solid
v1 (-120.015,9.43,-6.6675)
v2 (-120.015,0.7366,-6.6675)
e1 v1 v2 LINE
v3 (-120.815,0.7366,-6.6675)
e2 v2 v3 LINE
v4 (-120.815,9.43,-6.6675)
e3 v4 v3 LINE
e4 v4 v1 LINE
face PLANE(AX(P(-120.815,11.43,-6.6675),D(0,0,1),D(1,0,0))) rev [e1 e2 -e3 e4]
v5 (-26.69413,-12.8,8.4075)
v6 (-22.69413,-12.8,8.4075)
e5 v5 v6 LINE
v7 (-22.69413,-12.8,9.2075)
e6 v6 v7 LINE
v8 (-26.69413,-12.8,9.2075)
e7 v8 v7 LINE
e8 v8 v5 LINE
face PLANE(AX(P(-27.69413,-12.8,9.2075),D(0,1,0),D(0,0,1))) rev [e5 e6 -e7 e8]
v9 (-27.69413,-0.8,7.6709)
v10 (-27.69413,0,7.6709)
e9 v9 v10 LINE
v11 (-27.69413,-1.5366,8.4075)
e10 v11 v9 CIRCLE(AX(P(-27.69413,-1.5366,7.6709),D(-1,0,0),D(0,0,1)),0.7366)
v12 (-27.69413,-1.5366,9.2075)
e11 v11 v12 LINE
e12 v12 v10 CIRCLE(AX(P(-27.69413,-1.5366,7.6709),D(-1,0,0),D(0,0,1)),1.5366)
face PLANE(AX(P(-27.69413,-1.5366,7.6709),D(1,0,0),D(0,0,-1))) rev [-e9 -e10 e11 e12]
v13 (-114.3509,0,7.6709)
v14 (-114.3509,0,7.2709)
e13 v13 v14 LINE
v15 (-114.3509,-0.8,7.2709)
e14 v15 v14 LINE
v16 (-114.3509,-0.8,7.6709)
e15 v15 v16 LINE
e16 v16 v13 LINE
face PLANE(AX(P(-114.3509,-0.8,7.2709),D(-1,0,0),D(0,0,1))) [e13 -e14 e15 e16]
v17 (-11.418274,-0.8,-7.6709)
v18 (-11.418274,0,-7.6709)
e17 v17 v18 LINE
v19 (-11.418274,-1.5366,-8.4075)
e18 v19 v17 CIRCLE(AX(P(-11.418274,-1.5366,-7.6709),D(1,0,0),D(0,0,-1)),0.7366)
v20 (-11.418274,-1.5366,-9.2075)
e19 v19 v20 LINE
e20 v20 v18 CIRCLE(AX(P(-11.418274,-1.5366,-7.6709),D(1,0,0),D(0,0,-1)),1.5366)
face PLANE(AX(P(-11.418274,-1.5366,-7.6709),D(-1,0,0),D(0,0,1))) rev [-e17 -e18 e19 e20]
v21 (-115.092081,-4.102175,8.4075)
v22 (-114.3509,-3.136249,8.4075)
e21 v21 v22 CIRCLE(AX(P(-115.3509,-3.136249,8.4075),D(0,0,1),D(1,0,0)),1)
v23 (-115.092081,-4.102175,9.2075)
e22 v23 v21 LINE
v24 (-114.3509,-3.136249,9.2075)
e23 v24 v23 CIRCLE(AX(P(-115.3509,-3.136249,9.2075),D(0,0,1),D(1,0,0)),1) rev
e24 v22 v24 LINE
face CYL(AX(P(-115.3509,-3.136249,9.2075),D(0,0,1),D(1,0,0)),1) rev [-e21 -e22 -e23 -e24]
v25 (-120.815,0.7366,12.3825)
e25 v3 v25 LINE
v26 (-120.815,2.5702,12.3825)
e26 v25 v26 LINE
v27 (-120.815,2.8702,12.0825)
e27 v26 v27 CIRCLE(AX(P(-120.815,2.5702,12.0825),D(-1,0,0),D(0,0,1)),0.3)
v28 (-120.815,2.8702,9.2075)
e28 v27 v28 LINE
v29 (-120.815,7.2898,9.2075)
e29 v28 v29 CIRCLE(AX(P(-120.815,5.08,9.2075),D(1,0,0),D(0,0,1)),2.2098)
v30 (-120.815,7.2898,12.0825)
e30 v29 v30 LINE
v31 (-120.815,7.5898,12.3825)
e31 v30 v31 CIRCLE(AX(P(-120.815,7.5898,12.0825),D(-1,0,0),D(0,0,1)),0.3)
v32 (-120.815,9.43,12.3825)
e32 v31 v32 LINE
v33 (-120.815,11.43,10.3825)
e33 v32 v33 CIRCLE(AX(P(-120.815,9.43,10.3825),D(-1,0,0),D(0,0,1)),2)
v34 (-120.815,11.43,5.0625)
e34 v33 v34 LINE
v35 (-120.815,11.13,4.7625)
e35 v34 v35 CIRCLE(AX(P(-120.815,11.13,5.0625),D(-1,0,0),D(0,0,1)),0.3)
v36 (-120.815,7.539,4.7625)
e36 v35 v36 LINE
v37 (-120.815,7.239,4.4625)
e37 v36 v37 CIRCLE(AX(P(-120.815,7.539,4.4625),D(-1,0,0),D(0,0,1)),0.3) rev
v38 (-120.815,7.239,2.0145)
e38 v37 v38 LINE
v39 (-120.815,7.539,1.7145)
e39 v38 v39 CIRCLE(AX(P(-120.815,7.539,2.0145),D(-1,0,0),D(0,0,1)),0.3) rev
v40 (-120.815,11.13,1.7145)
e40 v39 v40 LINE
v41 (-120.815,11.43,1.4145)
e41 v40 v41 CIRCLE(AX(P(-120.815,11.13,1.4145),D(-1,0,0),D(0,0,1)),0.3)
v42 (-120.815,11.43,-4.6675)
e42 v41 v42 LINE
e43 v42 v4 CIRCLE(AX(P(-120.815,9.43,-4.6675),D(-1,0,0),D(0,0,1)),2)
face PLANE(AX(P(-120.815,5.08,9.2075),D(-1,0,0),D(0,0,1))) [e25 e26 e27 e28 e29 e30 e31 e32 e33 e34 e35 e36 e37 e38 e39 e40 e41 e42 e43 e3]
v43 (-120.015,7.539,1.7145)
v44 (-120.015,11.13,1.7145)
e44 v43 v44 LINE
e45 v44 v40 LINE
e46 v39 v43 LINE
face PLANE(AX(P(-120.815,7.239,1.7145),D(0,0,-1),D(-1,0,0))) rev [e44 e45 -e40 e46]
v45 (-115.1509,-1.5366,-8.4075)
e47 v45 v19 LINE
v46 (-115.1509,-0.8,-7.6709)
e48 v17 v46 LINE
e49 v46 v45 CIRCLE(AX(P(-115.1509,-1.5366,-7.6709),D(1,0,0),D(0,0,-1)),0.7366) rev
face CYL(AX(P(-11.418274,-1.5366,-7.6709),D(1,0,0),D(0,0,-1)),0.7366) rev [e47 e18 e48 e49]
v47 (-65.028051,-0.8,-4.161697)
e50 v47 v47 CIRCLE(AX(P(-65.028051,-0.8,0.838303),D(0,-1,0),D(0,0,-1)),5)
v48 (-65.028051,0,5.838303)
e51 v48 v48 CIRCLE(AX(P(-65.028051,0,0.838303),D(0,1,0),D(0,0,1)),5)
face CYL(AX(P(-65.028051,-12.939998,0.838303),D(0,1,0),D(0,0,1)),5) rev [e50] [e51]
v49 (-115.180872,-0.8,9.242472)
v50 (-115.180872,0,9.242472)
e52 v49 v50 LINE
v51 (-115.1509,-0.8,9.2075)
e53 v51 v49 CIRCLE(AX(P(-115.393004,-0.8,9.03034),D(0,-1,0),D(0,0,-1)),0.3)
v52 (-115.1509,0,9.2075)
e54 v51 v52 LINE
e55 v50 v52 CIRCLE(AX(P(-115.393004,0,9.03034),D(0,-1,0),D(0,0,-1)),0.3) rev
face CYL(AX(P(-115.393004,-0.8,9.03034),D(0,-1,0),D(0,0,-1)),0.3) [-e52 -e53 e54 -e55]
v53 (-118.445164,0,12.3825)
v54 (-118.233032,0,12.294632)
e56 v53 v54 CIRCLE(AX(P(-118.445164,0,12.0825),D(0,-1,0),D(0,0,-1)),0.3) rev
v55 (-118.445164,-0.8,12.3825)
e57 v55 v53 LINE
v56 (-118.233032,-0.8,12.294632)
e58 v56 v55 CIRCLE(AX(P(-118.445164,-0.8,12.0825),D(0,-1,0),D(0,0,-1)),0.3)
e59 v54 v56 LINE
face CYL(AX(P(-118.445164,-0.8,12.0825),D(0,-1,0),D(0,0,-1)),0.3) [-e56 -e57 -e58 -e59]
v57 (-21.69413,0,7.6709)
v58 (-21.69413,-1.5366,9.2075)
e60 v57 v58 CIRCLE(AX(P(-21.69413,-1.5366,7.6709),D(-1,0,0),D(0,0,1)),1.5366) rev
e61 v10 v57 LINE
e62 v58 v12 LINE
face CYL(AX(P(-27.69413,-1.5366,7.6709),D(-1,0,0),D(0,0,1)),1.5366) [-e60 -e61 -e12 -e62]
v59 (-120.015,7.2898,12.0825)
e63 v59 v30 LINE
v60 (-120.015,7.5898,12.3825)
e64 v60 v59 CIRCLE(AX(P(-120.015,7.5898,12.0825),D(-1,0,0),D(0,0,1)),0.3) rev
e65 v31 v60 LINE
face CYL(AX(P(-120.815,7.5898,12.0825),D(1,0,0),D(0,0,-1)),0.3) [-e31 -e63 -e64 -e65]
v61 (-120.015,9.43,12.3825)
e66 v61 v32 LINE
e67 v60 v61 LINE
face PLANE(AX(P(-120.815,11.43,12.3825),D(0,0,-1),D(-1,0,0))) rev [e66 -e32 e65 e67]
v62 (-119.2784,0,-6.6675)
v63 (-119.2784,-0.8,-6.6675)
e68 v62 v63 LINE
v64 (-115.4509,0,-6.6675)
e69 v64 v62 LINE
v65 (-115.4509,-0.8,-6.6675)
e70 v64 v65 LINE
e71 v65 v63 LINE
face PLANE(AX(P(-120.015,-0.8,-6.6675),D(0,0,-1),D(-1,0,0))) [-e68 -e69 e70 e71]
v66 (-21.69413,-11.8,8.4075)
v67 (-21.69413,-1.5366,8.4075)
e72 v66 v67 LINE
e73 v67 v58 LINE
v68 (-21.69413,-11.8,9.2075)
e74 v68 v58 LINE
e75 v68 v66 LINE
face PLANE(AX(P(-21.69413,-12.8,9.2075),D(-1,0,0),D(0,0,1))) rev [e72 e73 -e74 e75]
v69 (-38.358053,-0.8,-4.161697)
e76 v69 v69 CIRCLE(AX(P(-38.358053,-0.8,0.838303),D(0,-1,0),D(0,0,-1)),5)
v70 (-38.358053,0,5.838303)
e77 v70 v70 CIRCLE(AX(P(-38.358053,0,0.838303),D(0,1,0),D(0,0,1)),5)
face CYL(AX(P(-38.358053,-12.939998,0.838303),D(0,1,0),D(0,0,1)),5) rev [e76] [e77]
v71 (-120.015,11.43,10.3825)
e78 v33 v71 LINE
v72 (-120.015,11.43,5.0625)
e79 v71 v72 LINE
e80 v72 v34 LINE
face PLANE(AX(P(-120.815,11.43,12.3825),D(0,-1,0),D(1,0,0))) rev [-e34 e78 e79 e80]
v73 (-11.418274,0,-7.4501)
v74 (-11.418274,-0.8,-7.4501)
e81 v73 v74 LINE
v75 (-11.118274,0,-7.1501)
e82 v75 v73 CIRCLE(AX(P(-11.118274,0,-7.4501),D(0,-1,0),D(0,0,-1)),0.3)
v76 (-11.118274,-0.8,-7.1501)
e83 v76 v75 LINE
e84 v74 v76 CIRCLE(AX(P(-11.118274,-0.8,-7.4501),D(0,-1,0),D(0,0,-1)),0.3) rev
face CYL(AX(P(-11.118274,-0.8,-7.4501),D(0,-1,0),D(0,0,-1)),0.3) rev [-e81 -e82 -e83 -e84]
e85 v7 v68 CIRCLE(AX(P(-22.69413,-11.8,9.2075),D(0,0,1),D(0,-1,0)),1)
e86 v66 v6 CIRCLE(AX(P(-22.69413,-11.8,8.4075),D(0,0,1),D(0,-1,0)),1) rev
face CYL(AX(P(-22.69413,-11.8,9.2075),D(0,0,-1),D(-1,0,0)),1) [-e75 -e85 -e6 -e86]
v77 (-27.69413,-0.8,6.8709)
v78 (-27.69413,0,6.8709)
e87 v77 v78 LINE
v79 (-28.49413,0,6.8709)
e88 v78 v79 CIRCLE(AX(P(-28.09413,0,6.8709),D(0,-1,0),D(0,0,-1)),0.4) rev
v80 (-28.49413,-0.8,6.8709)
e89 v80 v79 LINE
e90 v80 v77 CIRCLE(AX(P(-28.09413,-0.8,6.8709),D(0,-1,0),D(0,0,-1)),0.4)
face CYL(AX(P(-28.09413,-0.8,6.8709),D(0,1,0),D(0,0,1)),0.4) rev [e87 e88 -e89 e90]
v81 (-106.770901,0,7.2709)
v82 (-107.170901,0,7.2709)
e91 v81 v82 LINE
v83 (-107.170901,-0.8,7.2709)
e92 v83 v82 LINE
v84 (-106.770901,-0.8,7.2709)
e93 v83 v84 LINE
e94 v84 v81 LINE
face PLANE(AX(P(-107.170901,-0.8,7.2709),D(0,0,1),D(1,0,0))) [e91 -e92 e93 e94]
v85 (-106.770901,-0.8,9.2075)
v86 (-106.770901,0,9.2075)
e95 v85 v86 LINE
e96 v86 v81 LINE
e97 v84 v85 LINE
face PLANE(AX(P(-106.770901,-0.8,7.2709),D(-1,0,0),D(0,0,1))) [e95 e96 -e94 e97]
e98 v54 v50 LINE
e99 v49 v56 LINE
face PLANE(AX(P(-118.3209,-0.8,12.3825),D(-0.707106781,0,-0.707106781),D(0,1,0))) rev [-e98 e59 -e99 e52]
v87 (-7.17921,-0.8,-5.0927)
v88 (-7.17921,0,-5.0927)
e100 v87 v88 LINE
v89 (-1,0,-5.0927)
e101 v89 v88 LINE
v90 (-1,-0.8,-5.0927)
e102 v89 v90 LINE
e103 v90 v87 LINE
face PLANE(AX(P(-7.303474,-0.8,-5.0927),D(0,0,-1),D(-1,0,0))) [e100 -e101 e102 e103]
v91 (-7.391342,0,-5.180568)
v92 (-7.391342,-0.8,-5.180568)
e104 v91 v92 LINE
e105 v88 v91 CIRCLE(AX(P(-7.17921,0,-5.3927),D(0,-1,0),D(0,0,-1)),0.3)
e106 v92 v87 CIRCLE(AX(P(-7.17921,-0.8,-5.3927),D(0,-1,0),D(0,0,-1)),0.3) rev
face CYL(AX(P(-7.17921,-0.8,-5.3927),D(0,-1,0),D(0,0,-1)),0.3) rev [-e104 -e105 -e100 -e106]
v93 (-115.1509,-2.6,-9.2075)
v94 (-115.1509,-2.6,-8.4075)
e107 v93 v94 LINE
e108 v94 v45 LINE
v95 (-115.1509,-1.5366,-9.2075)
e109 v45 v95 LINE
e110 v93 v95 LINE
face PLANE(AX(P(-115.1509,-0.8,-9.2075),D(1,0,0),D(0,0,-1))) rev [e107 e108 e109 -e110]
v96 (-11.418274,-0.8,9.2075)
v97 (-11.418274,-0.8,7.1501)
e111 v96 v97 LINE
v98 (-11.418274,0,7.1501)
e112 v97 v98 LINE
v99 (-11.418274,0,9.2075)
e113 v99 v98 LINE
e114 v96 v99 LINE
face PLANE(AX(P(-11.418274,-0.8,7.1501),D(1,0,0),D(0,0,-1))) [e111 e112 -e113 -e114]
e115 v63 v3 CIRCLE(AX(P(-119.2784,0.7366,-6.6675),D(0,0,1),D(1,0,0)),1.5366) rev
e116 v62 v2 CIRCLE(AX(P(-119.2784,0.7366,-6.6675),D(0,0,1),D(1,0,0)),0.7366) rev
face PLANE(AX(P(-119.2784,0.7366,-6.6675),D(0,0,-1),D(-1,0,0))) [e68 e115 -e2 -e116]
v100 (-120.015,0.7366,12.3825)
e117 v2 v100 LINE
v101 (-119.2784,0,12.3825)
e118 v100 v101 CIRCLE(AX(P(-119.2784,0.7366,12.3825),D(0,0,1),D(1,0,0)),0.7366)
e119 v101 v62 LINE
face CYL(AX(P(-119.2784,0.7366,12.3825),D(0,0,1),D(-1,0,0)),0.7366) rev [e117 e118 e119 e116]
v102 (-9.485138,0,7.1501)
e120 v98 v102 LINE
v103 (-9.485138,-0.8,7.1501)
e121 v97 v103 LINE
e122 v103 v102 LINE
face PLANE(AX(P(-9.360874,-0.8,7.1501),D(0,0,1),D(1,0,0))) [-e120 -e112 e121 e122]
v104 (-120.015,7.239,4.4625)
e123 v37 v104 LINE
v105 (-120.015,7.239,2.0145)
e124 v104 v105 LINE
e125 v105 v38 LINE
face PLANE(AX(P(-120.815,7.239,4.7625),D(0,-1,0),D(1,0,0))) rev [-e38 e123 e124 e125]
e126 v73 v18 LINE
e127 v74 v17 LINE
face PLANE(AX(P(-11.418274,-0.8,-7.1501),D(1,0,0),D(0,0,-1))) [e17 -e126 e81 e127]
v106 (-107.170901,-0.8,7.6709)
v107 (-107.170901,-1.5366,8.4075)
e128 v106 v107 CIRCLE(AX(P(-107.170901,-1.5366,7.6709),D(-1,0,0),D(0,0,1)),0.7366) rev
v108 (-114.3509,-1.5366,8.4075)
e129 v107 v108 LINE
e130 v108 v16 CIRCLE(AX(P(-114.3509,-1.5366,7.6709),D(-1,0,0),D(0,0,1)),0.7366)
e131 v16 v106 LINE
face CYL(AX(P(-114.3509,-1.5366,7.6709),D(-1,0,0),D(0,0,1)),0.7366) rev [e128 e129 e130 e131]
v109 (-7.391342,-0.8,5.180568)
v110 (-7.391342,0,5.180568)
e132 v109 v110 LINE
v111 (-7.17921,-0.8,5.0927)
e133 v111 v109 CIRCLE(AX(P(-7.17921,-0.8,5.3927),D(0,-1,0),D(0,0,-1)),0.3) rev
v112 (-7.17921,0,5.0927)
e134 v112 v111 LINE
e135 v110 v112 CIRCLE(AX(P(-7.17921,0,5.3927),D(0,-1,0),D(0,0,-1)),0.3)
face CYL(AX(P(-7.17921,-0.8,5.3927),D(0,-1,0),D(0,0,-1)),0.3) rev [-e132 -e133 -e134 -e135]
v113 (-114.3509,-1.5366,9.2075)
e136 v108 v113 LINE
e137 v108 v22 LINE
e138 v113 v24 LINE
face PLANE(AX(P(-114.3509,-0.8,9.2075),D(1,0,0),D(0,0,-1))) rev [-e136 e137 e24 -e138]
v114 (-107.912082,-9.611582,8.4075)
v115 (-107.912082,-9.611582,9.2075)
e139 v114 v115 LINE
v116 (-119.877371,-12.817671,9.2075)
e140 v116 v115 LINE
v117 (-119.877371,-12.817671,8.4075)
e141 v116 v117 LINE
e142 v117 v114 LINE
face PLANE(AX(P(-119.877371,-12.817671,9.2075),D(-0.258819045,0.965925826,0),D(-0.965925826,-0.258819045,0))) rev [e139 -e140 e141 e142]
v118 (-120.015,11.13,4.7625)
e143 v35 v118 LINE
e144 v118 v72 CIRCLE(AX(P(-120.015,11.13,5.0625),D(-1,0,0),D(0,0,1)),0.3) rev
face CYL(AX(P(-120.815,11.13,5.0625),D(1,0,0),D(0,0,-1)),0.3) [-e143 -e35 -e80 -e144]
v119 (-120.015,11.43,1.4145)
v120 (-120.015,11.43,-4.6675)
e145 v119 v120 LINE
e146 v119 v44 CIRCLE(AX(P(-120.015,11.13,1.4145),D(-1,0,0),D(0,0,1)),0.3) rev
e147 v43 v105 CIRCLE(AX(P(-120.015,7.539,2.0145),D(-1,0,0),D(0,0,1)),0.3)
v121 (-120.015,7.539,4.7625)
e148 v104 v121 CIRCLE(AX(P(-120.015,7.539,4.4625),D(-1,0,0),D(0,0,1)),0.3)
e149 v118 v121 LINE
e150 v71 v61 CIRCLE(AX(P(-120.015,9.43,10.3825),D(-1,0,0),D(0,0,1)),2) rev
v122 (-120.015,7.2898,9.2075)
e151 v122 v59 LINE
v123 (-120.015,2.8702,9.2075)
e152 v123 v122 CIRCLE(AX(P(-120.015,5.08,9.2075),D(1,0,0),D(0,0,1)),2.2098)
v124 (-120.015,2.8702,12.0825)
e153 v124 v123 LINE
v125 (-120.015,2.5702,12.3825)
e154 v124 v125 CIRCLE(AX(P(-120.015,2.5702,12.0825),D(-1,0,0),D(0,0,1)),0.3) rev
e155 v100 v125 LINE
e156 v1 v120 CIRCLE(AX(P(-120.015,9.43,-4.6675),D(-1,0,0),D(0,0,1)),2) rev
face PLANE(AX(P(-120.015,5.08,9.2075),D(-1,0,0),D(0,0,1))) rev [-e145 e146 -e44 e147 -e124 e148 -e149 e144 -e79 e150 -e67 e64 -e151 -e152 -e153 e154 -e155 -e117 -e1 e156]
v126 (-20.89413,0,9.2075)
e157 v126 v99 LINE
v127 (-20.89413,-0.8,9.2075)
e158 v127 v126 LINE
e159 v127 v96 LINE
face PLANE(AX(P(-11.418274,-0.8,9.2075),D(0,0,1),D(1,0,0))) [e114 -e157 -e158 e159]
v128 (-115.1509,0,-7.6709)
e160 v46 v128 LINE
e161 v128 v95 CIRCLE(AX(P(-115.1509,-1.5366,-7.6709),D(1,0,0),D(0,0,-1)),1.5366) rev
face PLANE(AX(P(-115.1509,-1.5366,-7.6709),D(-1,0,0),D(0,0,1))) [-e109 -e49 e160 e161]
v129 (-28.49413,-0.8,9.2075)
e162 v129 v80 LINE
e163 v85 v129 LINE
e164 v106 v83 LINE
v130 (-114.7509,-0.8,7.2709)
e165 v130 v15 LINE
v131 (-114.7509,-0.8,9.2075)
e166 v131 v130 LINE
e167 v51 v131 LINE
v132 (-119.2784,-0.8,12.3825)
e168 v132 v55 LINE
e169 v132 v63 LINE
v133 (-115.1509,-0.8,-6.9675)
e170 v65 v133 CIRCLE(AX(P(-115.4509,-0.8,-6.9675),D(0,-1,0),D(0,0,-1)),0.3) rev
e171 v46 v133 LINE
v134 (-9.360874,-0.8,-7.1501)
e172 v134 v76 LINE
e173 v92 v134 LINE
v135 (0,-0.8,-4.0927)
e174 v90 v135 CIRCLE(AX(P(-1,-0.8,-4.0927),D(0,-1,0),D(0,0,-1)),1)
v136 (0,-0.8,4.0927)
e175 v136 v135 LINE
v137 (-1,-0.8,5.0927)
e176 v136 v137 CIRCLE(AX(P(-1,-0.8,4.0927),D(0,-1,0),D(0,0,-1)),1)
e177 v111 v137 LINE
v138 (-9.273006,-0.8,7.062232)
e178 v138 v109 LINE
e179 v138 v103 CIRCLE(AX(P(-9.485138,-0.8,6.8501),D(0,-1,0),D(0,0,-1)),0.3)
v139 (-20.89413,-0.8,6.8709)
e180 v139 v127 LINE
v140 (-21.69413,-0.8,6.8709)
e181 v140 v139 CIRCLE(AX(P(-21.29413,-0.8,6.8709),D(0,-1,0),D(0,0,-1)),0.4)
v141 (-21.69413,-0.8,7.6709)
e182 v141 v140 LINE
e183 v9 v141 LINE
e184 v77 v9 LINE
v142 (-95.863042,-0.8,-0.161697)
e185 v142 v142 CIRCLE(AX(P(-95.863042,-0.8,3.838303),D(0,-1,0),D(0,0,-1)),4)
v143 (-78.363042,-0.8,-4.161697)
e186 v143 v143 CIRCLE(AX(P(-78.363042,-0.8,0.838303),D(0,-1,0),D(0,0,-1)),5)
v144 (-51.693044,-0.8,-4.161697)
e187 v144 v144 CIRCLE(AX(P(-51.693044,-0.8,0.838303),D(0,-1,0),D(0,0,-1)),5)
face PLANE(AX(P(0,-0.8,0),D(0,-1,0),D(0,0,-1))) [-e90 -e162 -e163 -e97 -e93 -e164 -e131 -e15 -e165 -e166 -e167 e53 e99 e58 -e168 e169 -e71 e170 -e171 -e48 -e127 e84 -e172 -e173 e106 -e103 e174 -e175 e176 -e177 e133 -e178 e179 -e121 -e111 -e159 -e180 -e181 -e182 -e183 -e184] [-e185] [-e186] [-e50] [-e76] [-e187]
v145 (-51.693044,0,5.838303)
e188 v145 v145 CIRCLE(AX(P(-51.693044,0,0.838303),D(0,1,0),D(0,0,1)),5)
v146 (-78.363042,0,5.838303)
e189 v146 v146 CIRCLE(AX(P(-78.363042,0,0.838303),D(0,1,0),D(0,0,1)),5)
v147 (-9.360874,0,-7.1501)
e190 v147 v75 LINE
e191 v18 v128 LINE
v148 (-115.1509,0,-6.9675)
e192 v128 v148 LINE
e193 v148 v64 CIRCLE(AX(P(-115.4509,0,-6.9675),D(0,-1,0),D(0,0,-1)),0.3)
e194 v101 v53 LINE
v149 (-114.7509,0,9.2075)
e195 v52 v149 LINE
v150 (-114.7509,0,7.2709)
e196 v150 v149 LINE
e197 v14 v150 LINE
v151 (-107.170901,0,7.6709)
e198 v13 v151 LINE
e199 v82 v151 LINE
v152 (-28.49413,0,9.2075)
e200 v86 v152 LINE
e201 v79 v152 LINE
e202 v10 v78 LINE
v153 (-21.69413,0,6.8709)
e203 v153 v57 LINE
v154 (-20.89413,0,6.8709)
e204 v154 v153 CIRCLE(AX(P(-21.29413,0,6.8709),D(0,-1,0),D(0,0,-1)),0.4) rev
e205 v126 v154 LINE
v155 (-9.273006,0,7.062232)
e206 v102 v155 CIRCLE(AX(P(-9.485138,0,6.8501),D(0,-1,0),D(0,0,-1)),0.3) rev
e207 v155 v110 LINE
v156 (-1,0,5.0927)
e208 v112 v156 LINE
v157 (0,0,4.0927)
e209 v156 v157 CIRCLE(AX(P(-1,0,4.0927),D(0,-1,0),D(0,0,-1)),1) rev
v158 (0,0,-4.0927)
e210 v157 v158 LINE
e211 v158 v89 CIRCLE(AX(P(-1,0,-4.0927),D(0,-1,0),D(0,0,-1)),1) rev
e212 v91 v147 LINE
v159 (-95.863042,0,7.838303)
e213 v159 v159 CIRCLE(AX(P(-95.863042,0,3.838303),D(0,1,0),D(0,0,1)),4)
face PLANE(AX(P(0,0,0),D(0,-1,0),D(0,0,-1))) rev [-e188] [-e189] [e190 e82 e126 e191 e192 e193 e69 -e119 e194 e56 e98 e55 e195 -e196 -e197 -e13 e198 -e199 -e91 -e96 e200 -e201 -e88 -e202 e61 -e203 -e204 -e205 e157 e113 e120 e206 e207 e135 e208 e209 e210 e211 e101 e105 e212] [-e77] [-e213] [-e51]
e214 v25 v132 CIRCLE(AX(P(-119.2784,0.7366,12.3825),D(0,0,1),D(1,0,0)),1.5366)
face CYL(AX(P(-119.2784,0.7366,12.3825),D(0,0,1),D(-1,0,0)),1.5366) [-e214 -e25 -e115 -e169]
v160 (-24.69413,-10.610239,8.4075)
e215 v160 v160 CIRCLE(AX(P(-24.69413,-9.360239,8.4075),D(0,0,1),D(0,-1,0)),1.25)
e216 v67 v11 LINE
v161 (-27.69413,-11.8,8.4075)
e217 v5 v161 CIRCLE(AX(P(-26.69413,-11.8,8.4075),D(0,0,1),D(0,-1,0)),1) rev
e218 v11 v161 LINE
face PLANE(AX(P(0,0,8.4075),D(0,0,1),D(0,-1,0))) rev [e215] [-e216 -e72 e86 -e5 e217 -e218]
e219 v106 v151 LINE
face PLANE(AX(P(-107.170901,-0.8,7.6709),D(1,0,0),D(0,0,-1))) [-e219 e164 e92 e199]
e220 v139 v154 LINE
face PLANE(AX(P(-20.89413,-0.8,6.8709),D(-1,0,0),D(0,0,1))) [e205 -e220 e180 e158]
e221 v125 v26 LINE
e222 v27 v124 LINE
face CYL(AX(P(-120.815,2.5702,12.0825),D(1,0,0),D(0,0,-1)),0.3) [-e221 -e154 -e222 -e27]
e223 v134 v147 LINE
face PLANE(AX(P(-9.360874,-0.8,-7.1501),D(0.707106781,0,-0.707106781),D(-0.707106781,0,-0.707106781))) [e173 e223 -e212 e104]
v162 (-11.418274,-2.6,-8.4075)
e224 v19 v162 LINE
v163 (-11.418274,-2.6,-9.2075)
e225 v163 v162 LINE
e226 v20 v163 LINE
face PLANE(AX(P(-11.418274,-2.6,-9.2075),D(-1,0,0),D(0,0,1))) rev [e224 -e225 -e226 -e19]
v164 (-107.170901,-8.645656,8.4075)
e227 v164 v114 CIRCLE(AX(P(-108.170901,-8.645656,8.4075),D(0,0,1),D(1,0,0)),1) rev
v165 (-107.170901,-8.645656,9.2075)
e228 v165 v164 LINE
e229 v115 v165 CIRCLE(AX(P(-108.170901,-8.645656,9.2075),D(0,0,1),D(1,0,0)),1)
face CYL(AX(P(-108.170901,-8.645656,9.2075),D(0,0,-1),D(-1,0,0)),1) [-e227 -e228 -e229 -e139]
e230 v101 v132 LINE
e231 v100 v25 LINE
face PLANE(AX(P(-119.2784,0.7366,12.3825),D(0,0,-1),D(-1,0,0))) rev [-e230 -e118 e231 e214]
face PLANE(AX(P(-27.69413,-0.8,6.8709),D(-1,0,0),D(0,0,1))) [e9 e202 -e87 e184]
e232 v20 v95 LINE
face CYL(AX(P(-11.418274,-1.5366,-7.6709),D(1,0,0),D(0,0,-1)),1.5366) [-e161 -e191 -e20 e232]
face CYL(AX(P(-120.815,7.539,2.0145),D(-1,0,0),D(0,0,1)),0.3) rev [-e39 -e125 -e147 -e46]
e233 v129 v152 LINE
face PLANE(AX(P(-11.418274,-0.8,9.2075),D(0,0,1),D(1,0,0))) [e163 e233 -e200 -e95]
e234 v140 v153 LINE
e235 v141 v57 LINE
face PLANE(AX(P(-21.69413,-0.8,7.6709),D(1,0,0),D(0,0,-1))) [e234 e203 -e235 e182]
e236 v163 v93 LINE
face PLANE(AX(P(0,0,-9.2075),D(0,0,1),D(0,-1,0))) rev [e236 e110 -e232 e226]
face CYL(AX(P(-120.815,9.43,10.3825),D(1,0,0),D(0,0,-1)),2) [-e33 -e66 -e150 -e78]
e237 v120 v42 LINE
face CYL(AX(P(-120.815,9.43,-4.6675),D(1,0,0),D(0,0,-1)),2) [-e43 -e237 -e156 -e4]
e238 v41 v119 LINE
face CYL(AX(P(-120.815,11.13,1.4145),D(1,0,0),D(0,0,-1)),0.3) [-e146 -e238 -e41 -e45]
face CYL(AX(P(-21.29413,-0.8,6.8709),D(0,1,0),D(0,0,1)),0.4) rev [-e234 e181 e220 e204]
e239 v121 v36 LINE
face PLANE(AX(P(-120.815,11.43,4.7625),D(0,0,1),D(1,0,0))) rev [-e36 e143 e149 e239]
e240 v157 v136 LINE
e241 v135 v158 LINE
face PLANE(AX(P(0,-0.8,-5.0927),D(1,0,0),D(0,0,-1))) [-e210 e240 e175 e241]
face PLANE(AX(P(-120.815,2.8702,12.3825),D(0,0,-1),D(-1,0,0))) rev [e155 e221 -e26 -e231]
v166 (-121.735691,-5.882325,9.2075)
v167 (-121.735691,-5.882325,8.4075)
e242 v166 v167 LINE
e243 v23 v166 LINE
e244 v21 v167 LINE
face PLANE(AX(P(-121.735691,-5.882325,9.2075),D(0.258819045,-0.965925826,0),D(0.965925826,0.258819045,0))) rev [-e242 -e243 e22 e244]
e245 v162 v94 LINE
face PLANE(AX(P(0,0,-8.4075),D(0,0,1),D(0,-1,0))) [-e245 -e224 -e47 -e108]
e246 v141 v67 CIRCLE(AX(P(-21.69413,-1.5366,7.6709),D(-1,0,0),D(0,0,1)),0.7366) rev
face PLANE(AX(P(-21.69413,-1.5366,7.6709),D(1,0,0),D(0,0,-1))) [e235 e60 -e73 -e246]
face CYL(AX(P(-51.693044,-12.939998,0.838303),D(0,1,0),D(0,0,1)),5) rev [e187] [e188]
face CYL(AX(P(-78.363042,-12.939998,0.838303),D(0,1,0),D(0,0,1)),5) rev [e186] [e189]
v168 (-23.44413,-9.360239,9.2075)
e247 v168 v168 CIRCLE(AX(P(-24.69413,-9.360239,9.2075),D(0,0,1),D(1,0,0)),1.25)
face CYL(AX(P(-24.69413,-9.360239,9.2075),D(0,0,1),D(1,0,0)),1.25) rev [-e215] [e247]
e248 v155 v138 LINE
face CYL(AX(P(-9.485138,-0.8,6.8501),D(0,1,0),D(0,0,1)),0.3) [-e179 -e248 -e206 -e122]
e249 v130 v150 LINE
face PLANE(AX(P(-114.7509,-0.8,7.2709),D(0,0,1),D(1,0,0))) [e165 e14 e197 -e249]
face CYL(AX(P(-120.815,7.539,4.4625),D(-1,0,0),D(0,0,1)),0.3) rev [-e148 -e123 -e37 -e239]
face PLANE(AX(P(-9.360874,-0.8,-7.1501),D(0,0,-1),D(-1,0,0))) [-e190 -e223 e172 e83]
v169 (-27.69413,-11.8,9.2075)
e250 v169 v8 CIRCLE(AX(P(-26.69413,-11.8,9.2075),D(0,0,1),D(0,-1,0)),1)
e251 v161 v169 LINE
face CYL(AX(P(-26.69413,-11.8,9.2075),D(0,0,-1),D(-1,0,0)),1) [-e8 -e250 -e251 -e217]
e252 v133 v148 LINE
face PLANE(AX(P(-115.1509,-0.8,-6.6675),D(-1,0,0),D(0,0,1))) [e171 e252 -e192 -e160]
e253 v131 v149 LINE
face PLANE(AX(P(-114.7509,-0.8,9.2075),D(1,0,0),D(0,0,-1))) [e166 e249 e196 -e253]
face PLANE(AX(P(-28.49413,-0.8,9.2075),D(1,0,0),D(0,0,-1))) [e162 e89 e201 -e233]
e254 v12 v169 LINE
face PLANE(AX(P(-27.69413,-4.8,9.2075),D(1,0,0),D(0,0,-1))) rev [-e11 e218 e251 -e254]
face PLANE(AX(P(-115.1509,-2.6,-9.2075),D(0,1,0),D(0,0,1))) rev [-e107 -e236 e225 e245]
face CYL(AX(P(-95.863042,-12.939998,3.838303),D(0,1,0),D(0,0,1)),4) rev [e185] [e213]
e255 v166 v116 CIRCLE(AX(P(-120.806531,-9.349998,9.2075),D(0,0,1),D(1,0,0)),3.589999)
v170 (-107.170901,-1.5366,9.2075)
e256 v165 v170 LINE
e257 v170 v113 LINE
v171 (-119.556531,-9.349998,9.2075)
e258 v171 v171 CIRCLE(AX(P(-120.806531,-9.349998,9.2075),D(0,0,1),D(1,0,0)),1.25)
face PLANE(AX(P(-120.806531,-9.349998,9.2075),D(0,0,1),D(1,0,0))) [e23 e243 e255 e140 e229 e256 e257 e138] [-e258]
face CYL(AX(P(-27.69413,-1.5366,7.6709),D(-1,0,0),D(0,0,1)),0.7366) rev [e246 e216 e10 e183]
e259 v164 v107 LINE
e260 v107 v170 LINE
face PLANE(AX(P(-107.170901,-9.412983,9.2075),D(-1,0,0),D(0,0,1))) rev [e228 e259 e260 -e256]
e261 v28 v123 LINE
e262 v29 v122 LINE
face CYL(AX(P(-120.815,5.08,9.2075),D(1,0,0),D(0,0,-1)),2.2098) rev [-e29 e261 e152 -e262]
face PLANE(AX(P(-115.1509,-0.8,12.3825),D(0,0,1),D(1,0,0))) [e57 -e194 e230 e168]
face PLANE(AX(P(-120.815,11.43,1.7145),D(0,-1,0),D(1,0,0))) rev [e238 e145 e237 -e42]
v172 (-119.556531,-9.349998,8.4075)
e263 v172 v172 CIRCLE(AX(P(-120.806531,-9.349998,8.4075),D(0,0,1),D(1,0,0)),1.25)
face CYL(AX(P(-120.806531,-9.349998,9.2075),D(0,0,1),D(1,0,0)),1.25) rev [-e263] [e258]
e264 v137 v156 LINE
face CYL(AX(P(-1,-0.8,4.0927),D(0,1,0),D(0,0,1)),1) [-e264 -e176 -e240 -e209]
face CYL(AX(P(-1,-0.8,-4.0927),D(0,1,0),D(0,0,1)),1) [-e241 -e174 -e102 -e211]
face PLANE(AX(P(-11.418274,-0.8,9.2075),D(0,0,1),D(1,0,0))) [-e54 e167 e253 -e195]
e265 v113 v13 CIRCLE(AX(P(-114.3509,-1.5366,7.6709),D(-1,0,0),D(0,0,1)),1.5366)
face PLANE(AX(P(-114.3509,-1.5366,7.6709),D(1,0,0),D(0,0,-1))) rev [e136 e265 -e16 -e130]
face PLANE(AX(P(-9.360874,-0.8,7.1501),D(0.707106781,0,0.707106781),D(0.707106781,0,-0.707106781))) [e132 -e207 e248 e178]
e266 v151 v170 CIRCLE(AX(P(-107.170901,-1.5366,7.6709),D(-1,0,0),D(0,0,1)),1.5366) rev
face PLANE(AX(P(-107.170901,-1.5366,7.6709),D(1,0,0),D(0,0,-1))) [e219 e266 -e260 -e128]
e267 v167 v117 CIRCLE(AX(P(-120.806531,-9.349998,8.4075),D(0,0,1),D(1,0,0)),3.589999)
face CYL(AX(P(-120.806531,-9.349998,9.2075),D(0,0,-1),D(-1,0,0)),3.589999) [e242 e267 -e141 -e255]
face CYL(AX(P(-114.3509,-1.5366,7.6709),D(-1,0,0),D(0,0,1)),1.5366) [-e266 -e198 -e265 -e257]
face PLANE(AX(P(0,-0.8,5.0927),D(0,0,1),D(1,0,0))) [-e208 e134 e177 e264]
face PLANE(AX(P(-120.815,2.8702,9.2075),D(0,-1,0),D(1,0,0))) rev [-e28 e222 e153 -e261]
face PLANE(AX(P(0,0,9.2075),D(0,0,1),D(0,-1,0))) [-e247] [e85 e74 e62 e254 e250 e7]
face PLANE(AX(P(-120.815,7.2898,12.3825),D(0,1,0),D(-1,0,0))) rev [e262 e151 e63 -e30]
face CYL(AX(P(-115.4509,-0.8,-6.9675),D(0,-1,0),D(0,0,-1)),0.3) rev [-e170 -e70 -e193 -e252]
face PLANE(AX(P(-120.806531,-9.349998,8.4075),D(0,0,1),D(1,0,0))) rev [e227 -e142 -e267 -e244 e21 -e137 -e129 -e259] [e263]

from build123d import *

# Parameters (mm, degrees)
BASE_FLANGE1_DEPTH            = 0.8
EDGE_FLANGE1_STRIP_W          = 4.6732
EDGE_FLANGE1_STRIP_H          = 0.8
EDGE_FLANGE1_STRIP_CUT_DEPTH  = 19.05
EDGE_FLANGE1_DEPTH            = 19.05
EDGE_FLANGE1_START            = 0.8
EDGE_FLANGE1_FLAT_DEPTH       = 0.8
CHAMFER2_SIZE                 = 3.17
EDGE_FLANGE2_START            = -1.5366
EDGE_FLANGE2_DEPTH            = 2.5366
EDGE_FLANGE2_START_2          = -0.084496
EDGE_FLANGE2_2_OUTLINE_W      = 6
EDGE_FLANGE2_2_OUTLINE_H      = 0.8
EDGE_FLANGE2_2_DEPTH          = 1.084496
EDGE_FLANGE2_START_3          = -12.8
EDGE_FLANGE2_3_OUTLINE_W      = 6
EDGE_FLANGE2_3_OUTLINE_H      = 0.8
EDGE_FLANGE2_3_DEPTH          = 11.2634
EDGE_FLANGE2_START_4          = -27.694130054
EDGE_FLANGE2_4_DEPTH          = 6
EDGE_FLANGE2_5_DEPTH          = 6
EDGE_FLANGE4_STRIP_W          = 4.6732
EDGE_FLANGE4_STRIP_H          = 0.8
EDGE_FLANGE4_STRIP_CUT_DEPTH  = 7.17999872
EDGE_FLANGE4_RELIEF_W         = 5.0732
EDGE_FLANGE4_RELIEF_H         = 0.4
EDGE_FLANGE4_RELIEF_CUT_DEPTH = 0.8
EDGE_FLANGE4_DEPTH            = 7.17999872
EDGE_FLANGE4_FLAT_DEPTH       = 0.8
M3X0_5_TAPPED_HOLE1_D         = 2.5
EDGE_FLANGE3_STRIP_W          = 4.6732
EDGE_FLANGE3_STRIP_H          = 0.8
EDGE_FLANGE3_STRIP_CUT_DEPTH  = 103.732625794
EDGE_FLANGE3_DEPTH            = 103.732625794
SKETCH21_R                    = 5
SKETCH21_R_2                  = 4
CUT_EXTRUDE1_DEPTH            = 126.679221242
FILLET1_R                     = 1
FILLET3_R                     = 2
FILLET4_R                     = 0.3
FILLET5_R                     = 1


with BuildPart() as part:
    # Base-Flange1: sheet metal written as solids
    # Sketch2 → Base-Flange1 (new body)
    with BuildSketch(Plane(origin=(0, 0, 0), x_dir=(1, 0, 0), z_dir=(0, 1, 0))):
        Polygon((-115.1509, -12.3825), (-120.015, -12.3825), (-120.015, 6.6675), (-115.1509, 6.6675), (-115.1509, 9.2075), (-11.418274206, 9.2075), (-11.418274206, 7.1501), (-9.360874206, 7.1501), (-7.303474206, 5.0927), (0, 5.0927), (0, -5.0927), (-7.303474206, -5.0927), (-9.360874206, -7.1501), (-11.418274206, -7.1501), (-11.418274206, -9.2075), (-115.1509, -9.2075), align=None)
    extrude(amount=-BASE_FLANGE1_DEPTH)

    # Edge-Flange1: sheet metal written as solids
    # Edge-Flange1 strip (on a plane across the edge) → Edge-Flange1 strip cut (cut)
    with BuildSketch(Plane(origin=(-120.015, 0, -6.6675), x_dir=(1, 0, 0), z_dir=(0, 0, 1))):
        with Locations((-1.6, -0.4)):
            Rectangle(EDGE_FLANGE1_STRIP_W, EDGE_FLANGE1_STRIP_H)
    extrude(amount=EDGE_FLANGE1_STRIP_CUT_DEPTH, mode=Mode.SUBTRACT)

    # Edge-Flange1 bend section (on a plane across the edge) → Edge-Flange1 (add)
    with BuildSketch(Plane(origin=(-120.015, 0, -6.6675), x_dir=(1, 0, 0), z_dir=(0, 0, 1))):
        with BuildLine():
            Line((-0.8, 0.7366), (0, 0.7366))
            ThreePointArc((0, 0.7366), (0.215745145, 0.215745145), (0.7366, 0))
            Line((0.7366, 0), (0.7366, -0.8))
            ThreePointArc((0.7366, -0.8), (-0.34994028, -0.34994028), (-0.8, 0.7366))
        make_face()
    extrude(amount=EDGE_FLANGE1_DEPTH)

    # Edge-Flange1 profile (on flange) → Edge-Flange1 flat (add)
    with BuildSketch(Plane.ZY.offset(120.015).offset(EDGE_FLANGE1_START)):
        with BuildLine():
            ThreePointArc((9.2075, 2.8702), (6.9977, 5.08), (9.2075, 7.2898))
            Line((9.2075, 7.2898), (12.3825, 7.2898))
            Line((12.3825, 7.2898), (12.3825, 11.43))
            Line((12.3825, 11.43), (4.7625, 11.43))
            Line((4.7625, 11.43), (4.7625, 7.239))
            Line((4.7625, 7.239), (1.7145, 7.239))
            Line((1.7145, 7.239), (1.7145, 11.43))
            Line((1.7145, 11.43), (-6.6675, 11.43))
            Line((-6.6675, 11.43), (-6.6675, 0.7366))
            Line((-6.6675, 0.7366), (12.3825, 0.7366))
            Line((12.3825, 0.7366), (12.3825, 2.8702))
            Line((12.3825, 2.8702), (9.2075, 2.8702))
        make_face()
    extrude(amount=-EDGE_FLANGE1_FLAT_DEPTH)

    # Chamfer2
    chamfer2_edges = [part.edges().sort_by_distance(p)[0] for p in [
        (-115.1509, -0.4, 12.3825),
    ]]
    chamfer(chamfer2_edges, length=CHAMFER2_SIZE)

    # Edge-Flange2: read off the stored shape, not the designer's step
    # Edge-Flange2 outline → Edge-Flange2 (cut)
    with BuildSketch(Plane(origin=(0, 0, 0), x_dir=(1, 0, 0), z_dir=(0, 1, 0)).offset(EDGE_FLANGE2_START)):
        with BuildLine():
            Line((-28.494130054, -9.2075), (-27.694130054, -9.2075))
            Line((-27.694130054, -9.2075), (-27.694130054, -6.8709))
            ThreePointArc((-27.694130054, -6.8709), (-28.094130054, -6.4709), (-28.494130054, -6.8709))
            Line((-28.494130054, -6.8709), (-28.494130054, -9.2075))
        make_face()
        with BuildLine():
            Line((-21.694130054, -6.8709), (-21.694130054, -9.2075))
            Line((-21.694130054, -9.2075), (-20.894130054, -9.2075))
            Line((-20.894130054, -9.2075), (-20.894130054, -6.8709))
            ThreePointArc((-20.894130054, -6.8709), (-21.294130054, -6.4709), (-21.694130054, -6.8709))
        make_face()
    extrude(amount=EDGE_FLANGE2_DEPTH, mode=Mode.SUBTRACT)

    # Edge-Flange2 2 outline → Edge-Flange2 2 (cut)
    with BuildSketch(Plane(origin=(0, 0, 0), x_dir=(1, 0, 0), z_dir=(0, 1, 0)).offset(EDGE_FLANGE2_START_2)):
        with Locations((-24.694130054, -8.8075)):
            Rectangle(EDGE_FLANGE2_2_OUTLINE_W, EDGE_FLANGE2_2_OUTLINE_H)
    extrude(amount=EDGE_FLANGE2_2_DEPTH, mode=Mode.SUBTRACT)

    # Edge-Flange2 4 outline → Edge-Flange2 4 (cut)
    with BuildSketch(Plane.YZ.offset(EDGE_FLANGE2_START_4)):
        with BuildLine():
            Line((-0.8, 9.2075), (-0.8, 9.019439951))
            ThreePointArc((-0.8, 9.019439951), (-0.215048049, 8.454889796), (0, 7.6709))
            Line((0, 7.6709), (0, 8.4075))
            Line((0, 8.4075), (-0.084496, 8.4075))
            Line((-0.084496, 8.4075), (-0.084496, 9.2075))
            Line((-0.084496, 9.2075), (-0.8, 9.2075))
        make_face()
    extrude(amount=EDGE_FLANGE2_4_DEPTH, mode=Mode.SUBTRACT)



with BuildPart() as body_2:
    # Edge-Flange2 3 outline → Edge-Flange2 3 (new body)
    with BuildSketch(Plane(origin=(0, 0, 0), x_dir=(1, 0, 0), z_dir=(0, 1, 0)).offset(EDGE_FLANGE2_START_3)):
        with Locations((-24.694130054, -8.8075)):
            Rectangle(EDGE_FLANGE2_3_OUTLINE_W, EDGE_FLANGE2_3_OUTLINE_H)
    extrude(amount=EDGE_FLANGE2_3_DEPTH)


with BuildPart() as part_1:
    add(part.part)

    add(body_2.part)  # Edge-Flange2 5 merges body 2
    # Edge-Flange2 5 outline → Edge-Flange2 5 (add)
    with BuildSketch(Plane.YZ.offset(EDGE_FLANGE2_START_4)):
        with BuildLine():
            ThreePointArc((-0.8, 9.019439951), (-1.156486155, 9.159742848), (-1.5366, 9.2075))
            Line((-1.5366, 9.2075), (-1.5366, 8.4075))
            ThreePointArc((-1.5366, 8.4075), (-1.015745145, 8.191754855), (-0.8, 7.6709))
            Line((-0.8, 7.6709), (-0.8, 9.019439951))
        make_face()
    extrude(amount=EDGE_FLANGE2_5_DEPTH)

    # Edge-Flange4: sheet metal written as solids
    # Edge-Flange4 strip (on a plane across the edge) → Edge-Flange4 strip cut (cut)
    with BuildSketch(Plane(origin=(-107.17090128, -0.8, 9.2075), x_dir=(0, 0, -1), z_dir=(-1, 0, 0))):
        with Locations((-0.8, -0.4)):
            Rectangle(EDGE_FLANGE4_STRIP_W, EDGE_FLANGE4_STRIP_H)
    extrude(amount=EDGE_FLANGE4_STRIP_CUT_DEPTH, mode=Mode.SUBTRACT)

    # Edge-Flange4 relief (on the sheet) → Edge-Flange4 relief cut (cut)
    with BuildSketch(Plane(origin=(-107.17090128, -0.8, 7.6709), x_dir=(0, 0, -1), z_dir=(0, -1, 0))):
        with Locations((-2.1366, 0.2)):
            Rectangle(EDGE_FLANGE4_RELIEF_W, EDGE_FLANGE4_RELIEF_H)
        with Locations((-2.1366, -7.37999872)):
            Rectangle(EDGE_FLANGE4_RELIEF_W, EDGE_FLANGE4_RELIEF_H)
    extrude(amount=-EDGE_FLANGE4_RELIEF_CUT_DEPTH, mode=Mode.SUBTRACT)

    # Edge-Flange4 bend section (on a plane across the edge) → Edge-Flange4 (add)
    with BuildSketch(Plane(origin=(-107.17090128, -0.8, 9.2075), x_dir=(0, 0, -1), z_dir=(-1, 0, 0))):
        with BuildLine():
            Line((0, 0.7366), (0.8, 0.7366))
            ThreePointArc((0.8, 0.7366), (1.015745145, 0.215745145), (1.5366, 0))
            Line((1.5366, 0), (1.5366, -0.8))
            ThreePointArc((1.5366, -0.8), (0.45005972, -0.34994028), (0, 0.7366))
        make_face()
    extrude(amount=EDGE_FLANGE4_DEPTH)

    # Edge-Flange4 profile (on flange) → Edge-Flange4 flat (add)
    with BuildSketch(Plane(origin=(0, -0.8, 9.2075), x_dir=(-1, 0, 0), z_dir=(0, 0, 1))):
        with BuildLine():
            ThreePointArc((121.735691381, 5.082325102), (124.274204272, 9.479158406), (119.877370968, 12.017671298))
            Line((119.877370968, 12.017671298), (107.17090128, 8.612983007))
            Line((107.17090128, 8.612983007), (107.17090128, 0.7366))
            Line((107.17090128, 0.7366), (114.3509, 0.7366))
            Line((114.3509, 0.7366), (114.3509, 3.103576215))
            Line((114.3509, 3.103576215), (121.735691381, 5.082325102))
        make_face()
    extrude(amount=-EDGE_FLANGE4_FLAT_DEPTH)

    # M3x0.5 Tapped Hole1 (through all)
    with Locations(Plane.XY.offset(9.2075)):
        with Locations((-120.806531174, -9.3499982), (-24.694130054, -9.36023907)):
            Hole(M3X0_5_TAPPED_HOLE1_D / 2)

    # Edge-Flange3: sheet metal written as solids
    # Edge-Flange3 strip (on a plane across the edge) → Edge-Flange3 strip cut (cut)
    with BuildSketch(Plane(origin=(-115.1509, -0.8, -9.2075), x_dir=(0, 0, 1), z_dir=(1, 0, 0))):
        with Locations((-0.8, -0.4)):
            Rectangle(EDGE_FLANGE3_STRIP_W, EDGE_FLANGE3_STRIP_H)
    extrude(amount=EDGE_FLANGE3_STRIP_CUT_DEPTH, mode=Mode.SUBTRACT)

    # Edge-Flange3 section (on a plane across the edge) → Edge-Flange3 (add)
    with BuildSketch(Plane(origin=(-115.1509, -0.8, -9.2075), x_dir=(0, 0, 1), z_dir=(1, 0, 0))):
        with BuildLine():
            Line((0, 0.7366), (0, 1.8))
            Line((0, 1.8), (0.8, 1.8))
            Line((0.8, 1.8), (0.8, 0.7366))
            ThreePointArc((0.8, 0.7366), (1.015745145, 0.215745145), (1.5366, 0))
            Line((1.5366, 0), (1.5366, -0.8))
            ThreePointArc((1.5366, -0.8), (0.45005972, -0.34994028), (0, 0.7366))
        make_face()
    extrude(amount=EDGE_FLANGE3_DEPTH)

    # Sketch21 → Cut-Extrude1 (cut, through all)
    with BuildSketch(Plane(origin=(0, 0, 0), x_dir=(1, 0, 0), z_dir=(0, 1, 0))):
        with Locations(Location((-78.363042127, -0.838303057, 0), (0, 0, 270))):
            Circle(SKETCH21_R)
        with Locations(Location((-95.863042127, -3.838303057, 0), (0, 0, 270))):
            Circle(SKETCH21_R_2)
        with Locations(Location((-65.028050672, -0.838303057, 0), (0, 0, 270))):
            Circle(SKETCH21_R)
        with Locations(Location((-51.693043958, -0.838303057, 0), (0, 0, 270))):
            Circle(SKETCH21_R)
        with Locations(Location((-38.358052503, -0.838303057, 0), (0, 0, 270))):
            Circle(SKETCH21_R)
    extrude(amount=-CUT_EXTRUDE1_DEPTH, mode=Mode.SUBTRACT)

    # Fillet1
    fillet1_edges = [part_1.edges().sort_by_distance(p)[0] for p in [
        (0, -0.4, -5.0927),
        (0, -0.4, 5.0927),
    ]]
    fillet(fillet1_edges, radius=FILLET1_R)

    # Fillet3
    fillet3_edges = [part_1.edges().sort_by_distance(p)[0] for p in [
        (-120.415, 11.43, -6.6675),
        (-120.415, 11.43, 12.3825),
    ]]
    fillet(fillet3_edges, radius=FILLET3_R)

    # Fillet4
    # the kernel refuses this fillet: 0.3 mm, written as the material it adds along each edge
    with BuildSketch(Plane(origin=(-115.1509, 0, -6.6675), x_dir=(-1, 0, 0), z_dir=(0, -1, 0))) as fillet4_piece_1:
        with BuildLine():
            CenterArc((FILLET4_R, FILLET4_R), FILLET4_R, 180, 90)
            Line((0, FILLET4_R), (0, 0))
            Line((0, 0), (FILLET4_R, 0))
        make_face()
    extrude(amount=0.8)
    with BuildSketch(Plane(origin=(-11.418274206, 0, -7.1501), x_dir=(1, 0, 0), z_dir=(0, -1, 0)), Plane(origin=(-120.815, 7.239, 4.7625), x_dir=(0, 1, 0), z_dir=(1, 0, 0)), Plane(origin=(-120.815, 7.239, 1.7145), x_dir=(0, 0, 1), z_dir=(1, 0, 0))) as fillet4_piece_2:
        with BuildLine():
            CenterArc((FILLET4_R, -FILLET4_R), FILLET4_R, 90, 90)
            Line((0, -FILLET4_R), (0, 0))
            Line((0, 0), (FILLET4_R, 0))
        make_face()
    extrude(amount=0.8)
    with BuildSketch(Plane(origin=(-7.303474206, 0, -5.0927), x_dir=(1, 0, 0), z_dir=(0, -1, 0))) as fillet4_piece_3:
        with BuildLine():
            CenterArc((FILLET4_R * 0.414213562373, -FILLET4_R), FILLET4_R, 90, 45)
            Line((-FILLET4_R * 0.292893218813, -FILLET4_R * 0.292893218813), (0, 0))
            Line((0, 0), (FILLET4_R * 0.414213562373, 0))
        make_face()
    extrude(amount=0.8)
    with BuildSketch(Plane(origin=(-7.303474206, 0, 5.0927), x_dir=(1, 0, 0), z_dir=(0, -1, 0))) as fillet4_piece_4:
        with BuildLine():
            CenterArc((FILLET4_R * 0.414213562373, FILLET4_R), FILLET4_R, 225, 45)
            Line((-FILLET4_R * 0.292893218813, FILLET4_R * 0.292893218813), (0, 0))
            Line((0, 0), (FILLET4_R * 0.414213562373, 0))
        make_face()
    extrude(amount=0.8)
    # the kernel refuses this fillet: 0.3 mm, written as the material it takes off along each edge
    with BuildSketch(Plane(origin=(-115.1509, 0.1059659, 9.2125), x_dir=(-0.7071067811864428, 0, 0.7071067811866523), z_dir=(0, -1, 0))) as fillet4_2_piece_1:
        with BuildLine():
            CenterArc((0.04238636, 0.3), FILLET4_R, 261.194947533, 8.805052467)
            Line((-0.003535534, 0.003535534), (0, 0))
            Line((0, 0), (0.04238636, 0))
        make_face()
    extrude(amount=1.0119318, mode=Mode.SUBTRACT)
    with BuildSketch(Plane(origin=(-9.360874206, 0.310660172, 7.1501), x_dir=(-1, 0, 0), z_dir=(0, -1, 0)), Plane(origin=(-118.3209, 0.310660172, 12.3825), x_dir=(-1, 0, 0), z_dir=(0, -1, 0))) as fillet4_2_piece_2:
        with BuildLine():
            CenterArc((FILLET4_R * 0.414213562373, FILLET4_R), FILLET4_R, 225, 45)
            Line((-FILLET4_R * 0.292893218813, FILLET4_R * 0.292893218813), (0, 0))
            Line((0, 0), (FILLET4_R * 0.414213562373, 0))
        make_face()
    extrude(amount=1.421320344, mode=Mode.SUBTRACT)
    with BuildSketch(Plane(origin=(-121.565, 2.8702, 12.3825), x_dir=(0, 0, -1), z_dir=(1, 0, 0)), Plane(origin=(-121.565, 7.2898, 12.3825), x_dir=(0, 1, 0), z_dir=(1, 0, 0)), Plane(origin=(-121.565, 11.43, 4.7625), x_dir=(0, -1, 0), z_dir=(1, 0, 0)), Plane(origin=(-121.565, 11.43, 1.7145), x_dir=(0, 0, -1), z_dir=(1, 0, 0))) as fillet4_2_piece_3:
        with BuildLine():
            CenterArc((FILLET4_R, -FILLET4_R), FILLET4_R, 90, 90)
            Line((0, -FILLET4_R), (0, 0))
            Line((0, 0), (FILLET4_R, 0))
        make_face()
    extrude(amount=2.3, mode=Mode.SUBTRACT)

    # Fillet5
    fillet5_edges = [part_1.edges().sort_by_distance(p)[0] for p in [
        (-21.694130054, -12.8, 8.8075),
        (-27.694130054, -12.8, 8.8075),
        (-107.17090128, -9.412983007, 8.8075),
        (-114.3509, -3.903576215, 8.8075),
    ]]
    fillet(fillet5_edges, radius=FILLET5_R)


solid = part_1.part
